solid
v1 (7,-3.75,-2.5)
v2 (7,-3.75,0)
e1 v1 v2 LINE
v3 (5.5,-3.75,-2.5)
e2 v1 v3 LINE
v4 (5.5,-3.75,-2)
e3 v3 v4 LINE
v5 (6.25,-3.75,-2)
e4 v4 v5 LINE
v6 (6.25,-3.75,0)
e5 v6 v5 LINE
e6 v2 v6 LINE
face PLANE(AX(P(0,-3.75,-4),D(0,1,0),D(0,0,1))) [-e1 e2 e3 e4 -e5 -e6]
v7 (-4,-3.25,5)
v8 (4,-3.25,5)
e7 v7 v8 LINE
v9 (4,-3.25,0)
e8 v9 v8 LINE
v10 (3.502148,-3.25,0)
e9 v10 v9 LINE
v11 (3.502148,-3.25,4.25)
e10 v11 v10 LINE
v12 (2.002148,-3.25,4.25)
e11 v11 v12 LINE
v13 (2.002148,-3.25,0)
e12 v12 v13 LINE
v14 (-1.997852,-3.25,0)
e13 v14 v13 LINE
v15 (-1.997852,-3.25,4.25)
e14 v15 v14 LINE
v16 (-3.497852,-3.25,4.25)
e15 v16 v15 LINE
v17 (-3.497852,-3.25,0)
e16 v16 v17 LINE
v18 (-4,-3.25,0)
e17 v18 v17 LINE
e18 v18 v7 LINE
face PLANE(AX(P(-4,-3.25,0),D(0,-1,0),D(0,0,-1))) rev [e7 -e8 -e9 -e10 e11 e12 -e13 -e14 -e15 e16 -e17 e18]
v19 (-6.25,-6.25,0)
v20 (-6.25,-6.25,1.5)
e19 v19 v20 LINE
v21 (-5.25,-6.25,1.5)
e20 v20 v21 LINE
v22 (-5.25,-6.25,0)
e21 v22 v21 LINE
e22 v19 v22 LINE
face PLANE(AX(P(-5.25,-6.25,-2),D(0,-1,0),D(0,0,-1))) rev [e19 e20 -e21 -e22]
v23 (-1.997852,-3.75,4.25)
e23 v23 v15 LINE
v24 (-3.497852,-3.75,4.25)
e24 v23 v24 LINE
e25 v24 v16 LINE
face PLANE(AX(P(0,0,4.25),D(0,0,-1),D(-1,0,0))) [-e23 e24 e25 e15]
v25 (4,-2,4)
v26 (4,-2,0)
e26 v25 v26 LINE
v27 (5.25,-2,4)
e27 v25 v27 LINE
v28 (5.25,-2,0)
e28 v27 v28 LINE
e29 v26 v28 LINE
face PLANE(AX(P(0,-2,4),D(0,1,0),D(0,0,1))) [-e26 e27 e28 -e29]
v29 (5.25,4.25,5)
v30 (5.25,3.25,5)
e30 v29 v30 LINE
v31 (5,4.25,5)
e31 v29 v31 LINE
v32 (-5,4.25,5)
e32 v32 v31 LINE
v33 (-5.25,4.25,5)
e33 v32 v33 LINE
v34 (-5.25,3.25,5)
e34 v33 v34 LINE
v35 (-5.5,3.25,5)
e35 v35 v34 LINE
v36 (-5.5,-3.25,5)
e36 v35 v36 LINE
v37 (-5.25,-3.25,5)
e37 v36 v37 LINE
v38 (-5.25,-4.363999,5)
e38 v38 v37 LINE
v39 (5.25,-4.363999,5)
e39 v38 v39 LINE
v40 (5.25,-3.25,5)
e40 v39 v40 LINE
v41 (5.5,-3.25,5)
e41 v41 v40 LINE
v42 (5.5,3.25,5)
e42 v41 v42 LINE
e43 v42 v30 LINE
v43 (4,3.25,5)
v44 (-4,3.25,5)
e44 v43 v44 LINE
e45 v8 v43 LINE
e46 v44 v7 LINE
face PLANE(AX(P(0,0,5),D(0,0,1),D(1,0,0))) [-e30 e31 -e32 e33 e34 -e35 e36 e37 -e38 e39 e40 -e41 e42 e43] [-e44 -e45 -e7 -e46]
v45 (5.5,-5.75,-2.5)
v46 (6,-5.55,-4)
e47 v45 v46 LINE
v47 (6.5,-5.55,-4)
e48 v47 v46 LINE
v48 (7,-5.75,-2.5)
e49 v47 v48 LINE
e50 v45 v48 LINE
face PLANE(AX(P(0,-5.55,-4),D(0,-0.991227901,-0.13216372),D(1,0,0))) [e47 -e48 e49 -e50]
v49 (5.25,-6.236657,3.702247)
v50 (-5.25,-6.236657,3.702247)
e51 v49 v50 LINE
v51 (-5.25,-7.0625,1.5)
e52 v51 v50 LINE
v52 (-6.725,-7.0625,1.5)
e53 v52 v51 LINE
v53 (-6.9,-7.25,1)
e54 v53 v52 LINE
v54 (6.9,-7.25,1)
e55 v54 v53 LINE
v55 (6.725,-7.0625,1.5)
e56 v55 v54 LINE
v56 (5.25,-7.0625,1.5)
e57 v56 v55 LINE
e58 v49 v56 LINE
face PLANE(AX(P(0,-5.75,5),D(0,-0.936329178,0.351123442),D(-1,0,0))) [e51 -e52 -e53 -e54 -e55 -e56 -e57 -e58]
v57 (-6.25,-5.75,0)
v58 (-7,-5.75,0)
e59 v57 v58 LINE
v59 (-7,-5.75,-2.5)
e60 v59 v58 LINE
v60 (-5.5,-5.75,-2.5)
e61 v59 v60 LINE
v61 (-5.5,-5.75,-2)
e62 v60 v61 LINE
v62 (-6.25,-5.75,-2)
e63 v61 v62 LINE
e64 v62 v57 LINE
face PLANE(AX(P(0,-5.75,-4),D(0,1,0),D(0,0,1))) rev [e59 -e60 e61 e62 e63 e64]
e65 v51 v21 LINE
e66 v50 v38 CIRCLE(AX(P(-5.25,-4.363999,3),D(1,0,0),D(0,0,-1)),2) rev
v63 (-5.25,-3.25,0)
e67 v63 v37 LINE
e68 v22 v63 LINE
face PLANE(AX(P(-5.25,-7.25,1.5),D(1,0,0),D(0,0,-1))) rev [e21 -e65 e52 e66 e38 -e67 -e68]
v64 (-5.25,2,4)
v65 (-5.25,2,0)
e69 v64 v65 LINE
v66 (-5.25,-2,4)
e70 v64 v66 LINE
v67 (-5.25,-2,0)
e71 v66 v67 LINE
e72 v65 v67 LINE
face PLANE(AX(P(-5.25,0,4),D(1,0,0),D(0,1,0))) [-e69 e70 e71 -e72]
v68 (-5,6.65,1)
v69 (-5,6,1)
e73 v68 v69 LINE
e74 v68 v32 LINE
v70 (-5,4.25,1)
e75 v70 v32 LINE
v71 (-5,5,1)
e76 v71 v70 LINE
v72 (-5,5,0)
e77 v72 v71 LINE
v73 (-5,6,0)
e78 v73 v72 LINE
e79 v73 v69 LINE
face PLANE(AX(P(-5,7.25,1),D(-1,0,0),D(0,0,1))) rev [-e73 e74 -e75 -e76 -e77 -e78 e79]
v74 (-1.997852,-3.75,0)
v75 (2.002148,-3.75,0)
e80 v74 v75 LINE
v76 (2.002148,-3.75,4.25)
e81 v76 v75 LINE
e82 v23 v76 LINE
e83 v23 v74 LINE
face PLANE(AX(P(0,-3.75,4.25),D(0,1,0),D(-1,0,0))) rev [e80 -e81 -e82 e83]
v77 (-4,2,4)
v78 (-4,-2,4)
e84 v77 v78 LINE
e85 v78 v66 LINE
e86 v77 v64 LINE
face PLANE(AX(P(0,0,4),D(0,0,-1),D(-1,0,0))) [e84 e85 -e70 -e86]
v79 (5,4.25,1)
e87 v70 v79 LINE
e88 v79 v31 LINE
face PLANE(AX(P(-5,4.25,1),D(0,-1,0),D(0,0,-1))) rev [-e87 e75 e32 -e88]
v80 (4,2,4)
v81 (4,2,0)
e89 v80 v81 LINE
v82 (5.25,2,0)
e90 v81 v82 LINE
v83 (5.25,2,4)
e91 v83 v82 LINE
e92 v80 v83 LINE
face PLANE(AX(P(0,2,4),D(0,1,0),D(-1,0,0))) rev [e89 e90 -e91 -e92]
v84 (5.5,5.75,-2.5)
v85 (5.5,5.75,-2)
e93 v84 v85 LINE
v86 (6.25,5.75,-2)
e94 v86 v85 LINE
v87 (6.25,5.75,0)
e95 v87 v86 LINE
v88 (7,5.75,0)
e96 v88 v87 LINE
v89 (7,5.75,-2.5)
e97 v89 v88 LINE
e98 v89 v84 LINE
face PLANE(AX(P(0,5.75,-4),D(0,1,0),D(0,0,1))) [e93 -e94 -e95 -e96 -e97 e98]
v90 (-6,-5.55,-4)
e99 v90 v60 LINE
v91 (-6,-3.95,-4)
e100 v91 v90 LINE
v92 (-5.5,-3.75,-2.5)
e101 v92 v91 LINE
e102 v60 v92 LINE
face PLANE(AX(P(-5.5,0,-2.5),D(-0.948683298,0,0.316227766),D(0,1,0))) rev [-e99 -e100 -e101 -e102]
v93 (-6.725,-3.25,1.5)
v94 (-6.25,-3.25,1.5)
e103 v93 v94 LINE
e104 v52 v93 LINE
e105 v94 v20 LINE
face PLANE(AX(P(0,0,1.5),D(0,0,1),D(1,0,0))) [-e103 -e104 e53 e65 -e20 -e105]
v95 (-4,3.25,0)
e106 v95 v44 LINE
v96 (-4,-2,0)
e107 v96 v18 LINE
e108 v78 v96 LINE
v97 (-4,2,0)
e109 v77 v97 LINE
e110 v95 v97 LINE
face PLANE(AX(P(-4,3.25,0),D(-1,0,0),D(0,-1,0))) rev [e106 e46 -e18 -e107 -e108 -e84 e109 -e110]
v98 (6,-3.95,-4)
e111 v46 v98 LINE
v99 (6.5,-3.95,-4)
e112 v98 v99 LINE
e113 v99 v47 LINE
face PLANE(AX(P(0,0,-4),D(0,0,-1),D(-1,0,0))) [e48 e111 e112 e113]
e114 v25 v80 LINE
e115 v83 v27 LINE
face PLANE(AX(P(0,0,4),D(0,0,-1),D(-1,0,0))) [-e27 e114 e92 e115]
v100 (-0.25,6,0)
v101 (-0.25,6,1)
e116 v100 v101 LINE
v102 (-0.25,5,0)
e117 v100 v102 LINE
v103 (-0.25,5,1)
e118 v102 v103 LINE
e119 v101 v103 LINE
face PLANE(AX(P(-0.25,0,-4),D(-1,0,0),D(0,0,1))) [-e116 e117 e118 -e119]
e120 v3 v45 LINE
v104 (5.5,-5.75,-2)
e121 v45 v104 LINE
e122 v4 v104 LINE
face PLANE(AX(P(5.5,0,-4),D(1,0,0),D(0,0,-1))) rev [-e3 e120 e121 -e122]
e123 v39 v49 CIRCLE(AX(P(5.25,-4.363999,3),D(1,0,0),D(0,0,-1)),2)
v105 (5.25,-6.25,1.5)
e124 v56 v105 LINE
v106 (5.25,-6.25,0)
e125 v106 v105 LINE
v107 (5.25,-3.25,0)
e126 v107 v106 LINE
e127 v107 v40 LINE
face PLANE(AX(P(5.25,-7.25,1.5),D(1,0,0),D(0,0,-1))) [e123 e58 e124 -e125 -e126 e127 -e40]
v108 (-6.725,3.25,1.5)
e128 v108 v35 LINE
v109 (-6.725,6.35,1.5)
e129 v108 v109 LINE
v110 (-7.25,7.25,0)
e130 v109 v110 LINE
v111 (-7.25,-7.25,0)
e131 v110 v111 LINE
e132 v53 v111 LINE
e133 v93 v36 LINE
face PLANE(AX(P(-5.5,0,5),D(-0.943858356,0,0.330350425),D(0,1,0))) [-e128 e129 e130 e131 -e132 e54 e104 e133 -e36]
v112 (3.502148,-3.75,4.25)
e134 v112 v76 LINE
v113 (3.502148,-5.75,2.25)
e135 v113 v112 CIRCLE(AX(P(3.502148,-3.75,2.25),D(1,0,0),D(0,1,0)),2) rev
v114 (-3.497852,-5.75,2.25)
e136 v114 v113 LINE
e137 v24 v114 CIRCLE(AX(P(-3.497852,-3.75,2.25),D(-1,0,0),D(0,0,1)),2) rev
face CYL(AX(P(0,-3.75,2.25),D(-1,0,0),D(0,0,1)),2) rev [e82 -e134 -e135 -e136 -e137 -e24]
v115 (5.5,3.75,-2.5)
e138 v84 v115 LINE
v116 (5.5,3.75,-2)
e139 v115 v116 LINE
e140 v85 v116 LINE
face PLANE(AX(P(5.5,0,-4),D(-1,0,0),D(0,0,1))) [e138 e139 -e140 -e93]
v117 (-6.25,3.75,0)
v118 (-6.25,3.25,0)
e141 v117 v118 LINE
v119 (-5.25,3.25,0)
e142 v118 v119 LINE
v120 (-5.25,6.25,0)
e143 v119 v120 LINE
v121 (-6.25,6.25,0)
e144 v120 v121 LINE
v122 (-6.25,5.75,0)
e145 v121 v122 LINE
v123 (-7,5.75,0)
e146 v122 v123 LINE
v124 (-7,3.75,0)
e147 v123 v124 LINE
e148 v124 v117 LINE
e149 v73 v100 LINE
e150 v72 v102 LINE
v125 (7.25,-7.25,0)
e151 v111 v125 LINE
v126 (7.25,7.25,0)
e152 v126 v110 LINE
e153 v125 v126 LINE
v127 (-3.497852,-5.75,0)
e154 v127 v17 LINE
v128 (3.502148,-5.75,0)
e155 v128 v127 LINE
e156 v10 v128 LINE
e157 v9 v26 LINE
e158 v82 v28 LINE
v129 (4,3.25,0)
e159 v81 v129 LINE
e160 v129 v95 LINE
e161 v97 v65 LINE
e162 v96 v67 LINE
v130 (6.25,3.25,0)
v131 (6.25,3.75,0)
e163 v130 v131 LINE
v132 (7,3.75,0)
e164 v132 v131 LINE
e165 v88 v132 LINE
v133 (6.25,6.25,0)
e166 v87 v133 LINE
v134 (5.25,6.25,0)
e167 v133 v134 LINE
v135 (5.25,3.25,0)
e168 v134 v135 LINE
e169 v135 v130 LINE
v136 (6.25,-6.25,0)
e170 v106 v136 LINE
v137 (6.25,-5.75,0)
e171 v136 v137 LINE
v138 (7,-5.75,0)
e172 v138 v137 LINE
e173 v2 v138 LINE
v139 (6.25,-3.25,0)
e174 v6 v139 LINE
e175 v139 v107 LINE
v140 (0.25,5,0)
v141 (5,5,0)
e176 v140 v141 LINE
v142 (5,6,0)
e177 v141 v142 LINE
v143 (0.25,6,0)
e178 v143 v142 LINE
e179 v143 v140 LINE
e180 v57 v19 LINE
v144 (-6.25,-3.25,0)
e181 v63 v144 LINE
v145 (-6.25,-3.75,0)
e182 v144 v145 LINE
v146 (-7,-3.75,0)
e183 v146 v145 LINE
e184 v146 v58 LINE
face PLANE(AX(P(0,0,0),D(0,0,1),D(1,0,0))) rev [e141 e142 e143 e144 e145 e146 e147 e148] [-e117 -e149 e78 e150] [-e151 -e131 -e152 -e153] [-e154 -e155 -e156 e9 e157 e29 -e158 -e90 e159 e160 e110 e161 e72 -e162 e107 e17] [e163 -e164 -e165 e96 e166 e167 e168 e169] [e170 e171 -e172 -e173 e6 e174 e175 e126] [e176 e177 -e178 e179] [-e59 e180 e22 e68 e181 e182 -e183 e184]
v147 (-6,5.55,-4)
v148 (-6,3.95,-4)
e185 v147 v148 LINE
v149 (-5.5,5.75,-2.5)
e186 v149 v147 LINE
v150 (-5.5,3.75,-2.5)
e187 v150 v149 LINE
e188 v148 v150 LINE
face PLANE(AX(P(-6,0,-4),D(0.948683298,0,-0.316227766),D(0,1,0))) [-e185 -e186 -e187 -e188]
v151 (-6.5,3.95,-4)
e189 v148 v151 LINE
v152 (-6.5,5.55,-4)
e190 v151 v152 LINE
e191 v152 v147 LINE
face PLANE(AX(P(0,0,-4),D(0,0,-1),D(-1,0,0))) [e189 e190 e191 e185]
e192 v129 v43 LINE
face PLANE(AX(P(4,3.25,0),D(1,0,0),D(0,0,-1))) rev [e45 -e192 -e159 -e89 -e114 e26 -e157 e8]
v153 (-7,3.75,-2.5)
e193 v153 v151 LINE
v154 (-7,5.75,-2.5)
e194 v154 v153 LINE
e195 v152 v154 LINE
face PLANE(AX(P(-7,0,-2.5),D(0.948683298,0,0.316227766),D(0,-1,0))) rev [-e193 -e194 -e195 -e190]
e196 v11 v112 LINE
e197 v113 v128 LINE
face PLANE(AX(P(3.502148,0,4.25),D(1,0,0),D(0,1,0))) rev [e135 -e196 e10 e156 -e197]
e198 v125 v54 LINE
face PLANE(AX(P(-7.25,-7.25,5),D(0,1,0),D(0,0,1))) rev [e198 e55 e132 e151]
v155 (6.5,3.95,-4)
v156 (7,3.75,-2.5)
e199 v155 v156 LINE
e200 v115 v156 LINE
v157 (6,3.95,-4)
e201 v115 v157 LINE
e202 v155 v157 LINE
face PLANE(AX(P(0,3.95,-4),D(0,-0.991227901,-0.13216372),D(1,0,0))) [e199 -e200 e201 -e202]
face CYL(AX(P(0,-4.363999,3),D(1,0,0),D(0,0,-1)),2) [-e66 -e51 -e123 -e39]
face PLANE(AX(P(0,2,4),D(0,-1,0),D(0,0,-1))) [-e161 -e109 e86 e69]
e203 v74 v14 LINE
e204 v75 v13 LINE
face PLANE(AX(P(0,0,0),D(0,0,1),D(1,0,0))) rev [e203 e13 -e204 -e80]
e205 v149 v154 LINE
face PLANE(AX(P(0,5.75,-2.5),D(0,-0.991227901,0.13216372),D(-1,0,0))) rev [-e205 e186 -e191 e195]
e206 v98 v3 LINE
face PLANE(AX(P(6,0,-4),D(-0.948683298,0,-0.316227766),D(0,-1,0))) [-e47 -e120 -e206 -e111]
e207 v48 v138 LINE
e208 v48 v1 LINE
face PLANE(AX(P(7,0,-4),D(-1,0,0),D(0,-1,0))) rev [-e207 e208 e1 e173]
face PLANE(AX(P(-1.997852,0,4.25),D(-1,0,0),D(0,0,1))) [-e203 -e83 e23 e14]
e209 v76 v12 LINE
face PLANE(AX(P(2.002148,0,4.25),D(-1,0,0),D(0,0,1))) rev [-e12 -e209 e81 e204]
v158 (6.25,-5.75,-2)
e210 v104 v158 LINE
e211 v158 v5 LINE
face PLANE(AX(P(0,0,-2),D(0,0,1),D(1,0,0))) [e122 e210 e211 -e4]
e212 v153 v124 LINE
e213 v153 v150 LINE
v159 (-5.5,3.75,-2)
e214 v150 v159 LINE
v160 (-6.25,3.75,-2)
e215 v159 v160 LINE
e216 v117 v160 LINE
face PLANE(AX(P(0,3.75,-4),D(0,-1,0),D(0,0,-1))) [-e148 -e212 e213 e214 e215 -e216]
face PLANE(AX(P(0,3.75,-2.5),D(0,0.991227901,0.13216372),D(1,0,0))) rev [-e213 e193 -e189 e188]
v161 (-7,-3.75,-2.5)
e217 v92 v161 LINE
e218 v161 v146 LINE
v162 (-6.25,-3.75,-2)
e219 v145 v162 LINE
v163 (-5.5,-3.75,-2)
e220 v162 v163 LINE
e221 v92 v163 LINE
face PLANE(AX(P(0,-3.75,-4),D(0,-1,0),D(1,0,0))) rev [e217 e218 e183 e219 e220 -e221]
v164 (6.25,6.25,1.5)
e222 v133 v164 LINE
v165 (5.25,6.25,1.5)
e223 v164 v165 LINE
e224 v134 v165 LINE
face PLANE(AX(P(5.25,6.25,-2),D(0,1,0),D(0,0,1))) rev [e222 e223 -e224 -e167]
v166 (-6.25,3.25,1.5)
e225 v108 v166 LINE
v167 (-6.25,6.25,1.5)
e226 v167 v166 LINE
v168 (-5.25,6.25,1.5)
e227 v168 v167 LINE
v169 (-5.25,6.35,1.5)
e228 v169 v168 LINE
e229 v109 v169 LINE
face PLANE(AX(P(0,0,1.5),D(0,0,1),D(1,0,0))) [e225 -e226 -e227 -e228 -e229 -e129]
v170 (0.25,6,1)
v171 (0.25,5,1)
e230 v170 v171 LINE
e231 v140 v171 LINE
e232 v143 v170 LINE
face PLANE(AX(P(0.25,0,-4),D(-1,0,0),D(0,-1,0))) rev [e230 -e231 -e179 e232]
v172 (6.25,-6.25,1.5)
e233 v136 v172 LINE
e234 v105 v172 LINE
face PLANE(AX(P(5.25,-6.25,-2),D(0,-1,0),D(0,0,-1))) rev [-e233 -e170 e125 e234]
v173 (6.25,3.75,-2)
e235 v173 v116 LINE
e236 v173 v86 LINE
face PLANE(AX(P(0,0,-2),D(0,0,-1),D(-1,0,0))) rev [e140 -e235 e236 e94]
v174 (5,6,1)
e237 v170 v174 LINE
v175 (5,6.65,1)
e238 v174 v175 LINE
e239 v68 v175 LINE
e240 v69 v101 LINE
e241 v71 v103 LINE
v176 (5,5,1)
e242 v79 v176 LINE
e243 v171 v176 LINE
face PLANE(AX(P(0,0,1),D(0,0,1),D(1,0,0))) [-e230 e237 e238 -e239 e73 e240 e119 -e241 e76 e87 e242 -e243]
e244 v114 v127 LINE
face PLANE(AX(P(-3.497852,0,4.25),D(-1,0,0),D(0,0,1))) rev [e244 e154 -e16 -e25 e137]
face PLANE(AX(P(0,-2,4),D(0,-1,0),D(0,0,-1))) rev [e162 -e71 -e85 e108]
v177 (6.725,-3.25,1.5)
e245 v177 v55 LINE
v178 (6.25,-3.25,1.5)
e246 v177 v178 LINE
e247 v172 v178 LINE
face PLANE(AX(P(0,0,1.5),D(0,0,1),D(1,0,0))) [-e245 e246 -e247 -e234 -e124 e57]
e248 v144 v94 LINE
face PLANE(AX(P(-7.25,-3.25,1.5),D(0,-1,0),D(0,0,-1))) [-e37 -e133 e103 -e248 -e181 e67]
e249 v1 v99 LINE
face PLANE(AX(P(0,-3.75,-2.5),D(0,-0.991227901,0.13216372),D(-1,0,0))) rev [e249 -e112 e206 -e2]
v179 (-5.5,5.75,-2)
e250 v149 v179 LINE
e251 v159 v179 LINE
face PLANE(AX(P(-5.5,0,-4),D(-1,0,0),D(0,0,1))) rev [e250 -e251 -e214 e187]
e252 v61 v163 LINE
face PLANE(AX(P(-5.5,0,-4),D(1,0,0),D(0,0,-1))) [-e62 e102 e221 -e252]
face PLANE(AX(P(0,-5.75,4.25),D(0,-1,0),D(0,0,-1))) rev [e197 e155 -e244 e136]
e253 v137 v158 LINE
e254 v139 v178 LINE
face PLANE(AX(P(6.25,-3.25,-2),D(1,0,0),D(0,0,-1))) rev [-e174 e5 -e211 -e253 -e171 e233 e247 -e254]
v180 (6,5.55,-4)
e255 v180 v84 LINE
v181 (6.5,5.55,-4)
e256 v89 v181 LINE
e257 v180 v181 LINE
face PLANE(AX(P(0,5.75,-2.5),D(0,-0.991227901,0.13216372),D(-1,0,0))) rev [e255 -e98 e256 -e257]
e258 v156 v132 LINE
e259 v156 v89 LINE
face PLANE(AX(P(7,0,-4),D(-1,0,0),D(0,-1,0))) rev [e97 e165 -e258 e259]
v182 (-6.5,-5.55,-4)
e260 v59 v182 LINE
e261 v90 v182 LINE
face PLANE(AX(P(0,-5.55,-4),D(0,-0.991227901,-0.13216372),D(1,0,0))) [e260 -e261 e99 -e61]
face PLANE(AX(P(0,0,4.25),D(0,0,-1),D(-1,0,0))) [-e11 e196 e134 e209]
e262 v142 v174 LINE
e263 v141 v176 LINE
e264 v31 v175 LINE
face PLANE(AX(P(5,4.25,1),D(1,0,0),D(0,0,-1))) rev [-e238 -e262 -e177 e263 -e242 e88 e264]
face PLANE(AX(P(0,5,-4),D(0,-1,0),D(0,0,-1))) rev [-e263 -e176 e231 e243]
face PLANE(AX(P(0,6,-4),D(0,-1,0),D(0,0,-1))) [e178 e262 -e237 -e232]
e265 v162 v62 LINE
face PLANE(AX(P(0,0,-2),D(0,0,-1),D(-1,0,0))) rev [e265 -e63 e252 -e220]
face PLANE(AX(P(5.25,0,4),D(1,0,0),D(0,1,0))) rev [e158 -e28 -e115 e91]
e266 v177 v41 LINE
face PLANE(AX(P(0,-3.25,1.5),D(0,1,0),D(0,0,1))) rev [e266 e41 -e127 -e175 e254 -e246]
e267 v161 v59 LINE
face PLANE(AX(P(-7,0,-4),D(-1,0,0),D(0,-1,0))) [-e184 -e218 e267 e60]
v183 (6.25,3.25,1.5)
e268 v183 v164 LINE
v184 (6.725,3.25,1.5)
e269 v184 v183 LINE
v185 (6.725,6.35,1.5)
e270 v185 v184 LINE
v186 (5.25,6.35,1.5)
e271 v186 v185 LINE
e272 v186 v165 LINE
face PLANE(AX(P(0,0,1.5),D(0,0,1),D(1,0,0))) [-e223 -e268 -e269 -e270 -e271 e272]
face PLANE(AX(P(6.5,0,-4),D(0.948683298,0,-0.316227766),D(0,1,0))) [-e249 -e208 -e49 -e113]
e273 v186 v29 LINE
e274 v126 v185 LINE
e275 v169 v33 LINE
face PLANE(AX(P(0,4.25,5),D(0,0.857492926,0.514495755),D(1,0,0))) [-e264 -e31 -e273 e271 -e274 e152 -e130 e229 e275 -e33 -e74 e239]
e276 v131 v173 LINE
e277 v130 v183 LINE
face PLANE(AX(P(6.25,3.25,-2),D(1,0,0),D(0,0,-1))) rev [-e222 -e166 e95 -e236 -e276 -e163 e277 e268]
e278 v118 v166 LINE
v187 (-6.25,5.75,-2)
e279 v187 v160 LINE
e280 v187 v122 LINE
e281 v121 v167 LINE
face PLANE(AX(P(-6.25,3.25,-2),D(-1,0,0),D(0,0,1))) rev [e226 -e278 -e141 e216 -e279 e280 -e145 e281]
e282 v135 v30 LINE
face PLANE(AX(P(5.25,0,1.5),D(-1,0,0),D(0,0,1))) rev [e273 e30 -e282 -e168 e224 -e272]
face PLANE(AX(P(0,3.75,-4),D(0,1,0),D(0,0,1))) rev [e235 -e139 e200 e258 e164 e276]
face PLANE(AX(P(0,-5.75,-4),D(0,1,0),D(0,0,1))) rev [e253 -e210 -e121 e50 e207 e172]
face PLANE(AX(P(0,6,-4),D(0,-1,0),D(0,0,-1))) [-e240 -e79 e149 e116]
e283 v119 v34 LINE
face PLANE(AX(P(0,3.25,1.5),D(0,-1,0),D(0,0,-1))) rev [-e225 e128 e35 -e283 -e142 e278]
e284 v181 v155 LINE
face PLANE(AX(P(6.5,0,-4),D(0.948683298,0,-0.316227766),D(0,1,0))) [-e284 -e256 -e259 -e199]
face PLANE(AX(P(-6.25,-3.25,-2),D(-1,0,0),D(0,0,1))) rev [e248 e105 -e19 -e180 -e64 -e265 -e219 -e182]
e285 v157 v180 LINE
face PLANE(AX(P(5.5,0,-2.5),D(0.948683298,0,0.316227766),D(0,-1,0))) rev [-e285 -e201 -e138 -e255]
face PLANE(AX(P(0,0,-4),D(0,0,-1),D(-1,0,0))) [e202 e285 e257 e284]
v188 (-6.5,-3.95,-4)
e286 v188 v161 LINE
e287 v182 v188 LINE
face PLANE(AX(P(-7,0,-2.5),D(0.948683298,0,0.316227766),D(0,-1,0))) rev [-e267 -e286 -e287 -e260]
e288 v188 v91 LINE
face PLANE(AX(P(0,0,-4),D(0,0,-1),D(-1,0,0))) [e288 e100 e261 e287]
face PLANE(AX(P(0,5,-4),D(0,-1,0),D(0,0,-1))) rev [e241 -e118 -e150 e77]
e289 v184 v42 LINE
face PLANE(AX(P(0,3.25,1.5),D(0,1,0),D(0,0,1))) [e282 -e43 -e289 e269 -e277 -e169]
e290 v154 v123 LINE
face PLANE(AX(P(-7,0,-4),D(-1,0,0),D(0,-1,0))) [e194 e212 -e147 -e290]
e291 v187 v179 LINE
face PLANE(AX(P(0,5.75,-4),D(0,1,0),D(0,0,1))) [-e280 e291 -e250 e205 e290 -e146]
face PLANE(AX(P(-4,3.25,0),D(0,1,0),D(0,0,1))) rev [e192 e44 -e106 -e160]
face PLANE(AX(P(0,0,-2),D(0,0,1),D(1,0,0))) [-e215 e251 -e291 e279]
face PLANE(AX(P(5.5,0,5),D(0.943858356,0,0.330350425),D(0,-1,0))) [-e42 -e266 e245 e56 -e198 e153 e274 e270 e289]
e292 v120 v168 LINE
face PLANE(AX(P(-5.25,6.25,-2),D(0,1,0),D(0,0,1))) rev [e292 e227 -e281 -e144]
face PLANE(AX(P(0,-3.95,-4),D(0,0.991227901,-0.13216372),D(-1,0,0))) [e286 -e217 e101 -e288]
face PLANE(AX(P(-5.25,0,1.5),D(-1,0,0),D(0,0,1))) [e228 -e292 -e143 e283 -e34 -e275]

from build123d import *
from OCP.BRepFilletAPI import BRepFilletAPI_MakeChamfer

# Parameters (mm, degrees)
ESQUISSE1_W             = 14.5
ESQUISSE1_H             = 14.5
BOSS_EXTRU_1_DEPTH      = 5
ESQUISSE2_W             = 8
ESQUISSE2_H             = 6.5
ENL_V_MAT_EXTRU_1_DEPTH = 12.407234547
CHANFREIN1_SIZE         = 5
CHANFREIN1_SIZE_2       = 1.75
CHANFREIN2_SIZE         = 5
CHANFREIN2_SIZE_2       = 3
ESQUISSE3_W             = 2
ESQUISSE3_H             = 4
ENL_V_MAT_EXTRU_2_DEPTH = 3.5
ESQUISSE6_W             = 10
ESQUISSE6_H             = 3
ENL_V_MAT_EXTRU_3_DEPTH = 4
CHANFREIN3_SIZE         = 4
CHANFREIN3_SIZE2        = 1.5
CONG_1_R                = 2
ESQUISSE7_W             = 1.25
ESQUISSE7_H             = 4
ENL_V_MAT_EXTRU_4_DEPTH = 4
ESQUISSE8_W             = 1.5
ESQUISSE8_H             = 2
BOSS_EXTRU_2_DEPTH      = 4
CHANFREIN4_SIZE         = 0.2
CHANFREIN4_SIZE2        = 1.5
CHANFREIN5_SIZE         = 1.5
CHANFREIN5_SIZE2        = 0.2
CHANFREIN6_SIZE         = 0.5
CHANFREIN6_SIZE2        = 1.5
CHANFREIN7_SIZE         = 1.5
CHANFREIN7_SIZE2        = 0.5
ESQUISSE9_W             = 1
ESQUISSE9_H             = 3
ENL_V_MAT_EXTRU_5_DEPTH = 3.5
ESQUISSE10_W            = 4.75
ESQUISSE10_H            = 1
ENL_V_MAT_EXTRU_6_DEPTH = 12.407234547
ESQUISSE11_W            = 1.5
ESQUISSE11_H            = 0.5
ENL_V_MAT_EXTRU_7_DEPTH = 4.25
CONG_2_START            = -3.497851783
CONG_2_DEPTH            = 7


with BuildPart() as part:
    # Esquisse1 → Boss.-Extru.1 (new body)
    with BuildSketch(Plane.XY):
        Rectangle(ESQUISSE1_W, ESQUISSE1_H)
    extrude(amount=BOSS_EXTRU_1_DEPTH)

    # Esquisse2 → Enlèv. mat.-Extru.1 (cut, through all)
    with BuildSketch(Plane.XY.offset(5)):
        Rectangle(ESQUISSE2_W, ESQUISSE2_H)
    extrude(amount=-ENL_V_MAT_EXTRU_1_DEPTH, mode=Mode.SUBTRACT)

    # Chanfrein1
    # the kernel refuses this chamfer: 5, 1.75 mm, written as the material it takes off along each edge
    with BuildSketch(Plane(origin=(7.25, 20.222980747, 5), x_dir=(0, 0, -1), z_dir=(0, -1, 0)), Plane(origin=(-7.25, -20.222980747, 5), x_dir=(0, 0, -1), z_dir=(0, 1, 0))) as chanfrein1_piece_1:
        Polygon((CHANFREIN1_SIZE, 0), (0, -CHANFREIN1_SIZE_2), (0, 0), align=None)
    extrude(amount=40.445961493, mode=Mode.SUBTRACT)

    # Chanfrein2
    # the kernel refuses this chamfer: 5, 3 mm, written as the material it takes off along each edge
    with BuildSketch(Plane(origin=(-18.431305486, 7.25, 5), x_dir=(0, 0, -1), z_dir=(1, 0, 0))) as chanfrein2_piece_1:
        Polygon((CHANFREIN2_SIZE, 0), (0, -CHANFREIN2_SIZE_2), (0, 0), align=None)
    extrude(amount=36.862610972, mode=Mode.SUBTRACT)

    # Esquisse3 → Enlèv. mat.-Extru.2 (cut)
    with BuildSketch(Plane.XY.offset(5)):
        with Locations((-6.25, 5.25)):
            Rectangle(ESQUISSE3_W, ESQUISSE3_H)
        with Locations((6.25, 5.25)):
            Rectangle(ESQUISSE3_W, ESQUISSE3_H)
        with Locations((6.25, -5.25)):
            Rectangle(ESQUISSE3_W, ESQUISSE3_H)
        with Locations((-6.25, -5.25)):
            Rectangle(ESQUISSE3_W, ESQUISSE3_H)
    extrude(amount=-ENL_V_MAT_EXTRU_2_DEPTH, mode=Mode.SUBTRACT)

    # Esquisse6 → Enlèv. mat.-Extru.3 (cut)
    with BuildSketch(Plane.XY.offset(5)):
        with Locations((0, 5.75)):
            Rectangle(ESQUISSE6_W, ESQUISSE6_H)
    extrude(amount=-ENL_V_MAT_EXTRU_3_DEPTH, mode=Mode.SUBTRACT)

    # Chanfrein3
    chanfrein3_edges = [part.edges().sort_by_distance(p)[0] for p in [
        (0, -7.25, 5),
    ]]
    chanfrein3_side = [part.faces().sort_by_distance(p)[0] for p in [
        (0, -7.25, 2.338531514),
    ]]
    chamfer(chanfrein3_edges, length=CHANFREIN3_SIZE, length2=CHANFREIN3_SIZE2, reference=chanfrein3_side[0])

    # Congé1
    cong_1_edges = [part.edges().sort_by_distance(p)[0] for p in [
        (0, -5.75, 5),
    ]]
    fillet(cong_1_edges, radius=CONG_1_R)

    # Esquisse7 → Enlèv. mat.-Extru.4 (cut)
    with BuildSketch(Plane(origin=(0, 0, 0), x_dir=(-1, 0, 0), z_dir=(0, 0, -1))):
        with Locations((-4.625, 0)):
            Rectangle(ESQUISSE7_W, ESQUISSE7_H)
        with Locations((4.625, 0)):
            Rectangle(ESQUISSE7_W, ESQUISSE7_H)
    extrude(amount=-ENL_V_MAT_EXTRU_4_DEPTH, mode=Mode.SUBTRACT)

    # Esquisse8 → Boss.-Extru.2 (add)
    with BuildSketch(Plane(origin=(0, 0, 0), x_dir=(-1, 0, 0), z_dir=(0, 0, -1))):
        with Locations((-6.25, 4.75)):
            Rectangle(ESQUISSE8_W, ESQUISSE8_H)
        with Locations((6.25, 4.75)):
            Rectangle(ESQUISSE8_W, ESQUISSE8_H)
        with Locations((6.25, -4.75)):
            Rectangle(ESQUISSE8_W, ESQUISSE8_H)
        with Locations((-6.25, -4.75)):
            Rectangle(ESQUISSE8_W, ESQUISSE8_H)
    extrude(amount=BOSS_EXTRU_2_DEPTH)

    # Chanfrein4: one chamfer whose edges measure the first distance from different faces: ONE call of the kernel's chamfer builder (chamfer() names one face for all edges)
    chanfrein4_edges_1 = [part.edges().sort_by_distance(p)[0] for p in [
        (6.25, 5.75, -4),
    ]]
    chanfrein4_side_1 = [part.faces().sort_by_distance(p)[0] for p in [
        (6.25, 4.75, -4),
    ]]
    chanfrein4_edges_2 = [part.edges().sort_by_distance(p)[0] for p in [
        (-6.25, 3.75, -4),
        (-6.25, 5.75, -4),
    ]]
    chanfrein4_side_2 = [part.faces().sort_by_distance(p)[0] for p in [
        (-6.25, 4.75, -4),
    ]]
    chanfrein4_edges_3 = [part.edges().sort_by_distance(p)[0] for p in [
        (6.25, -3.75, -4),
    ]]
    chanfrein4_side_3 = [part.faces().sort_by_distance(p)[0] for p in [
        (6.25, -4.75, -4),
    ]]
    chanfrein4 = BRepFilletAPI_MakeChamfer(part.part.solid().wrapped)
    for e in chanfrein4_edges_1:
        chanfrein4.Add(CHANFREIN4_SIZE, CHANFREIN4_SIZE2, e.wrapped, chanfrein4_side_1[0].wrapped)  # the first distance lies on this face
    for e in chanfrein4_edges_2:
        chanfrein4.Add(CHANFREIN4_SIZE, CHANFREIN4_SIZE2, e.wrapped, chanfrein4_side_2[0].wrapped)  # the first distance lies on this face
    for e in chanfrein4_edges_3:
        chanfrein4.Add(CHANFREIN4_SIZE, CHANFREIN4_SIZE2, e.wrapped, chanfrein4_side_3[0].wrapped)  # the first distance lies on this face
    add(Compound.cast(chanfrein4.Shape()), mode=Mode.REPLACE)

    # Chanfrein5: one chamfer whose edges measure the first distance from different faces: ONE call of the kernel's chamfer builder (chamfer() names one face for all edges)
    chanfrein5_edges_1 = [part.edges().sort_by_distance(p)[0] for p in [
        (6.25, 3.75, -4),
    ]]
    chanfrein5_side_1 = [part.faces().sort_by_distance(p)[0] for p in [
        (6.25, 3.75, -2),
    ]]
    chanfrein5_edges_2 = [part.edges().sort_by_distance(p)[0] for p in [
        (-6.25, -5.75, -4),
    ]]
    chanfrein5_side_2 = [part.faces().sort_by_distance(p)[0] for p in [
        (-6.25, -5.75, -2),
    ]]
    chanfrein5_edges_3 = [part.edges().sort_by_distance(p)[0] for p in [
        (-6.25, -3.75, -4),
    ]]
    chanfrein5_side_3 = [part.faces().sort_by_distance(p)[0] for p in [
        (-6.25, -3.75, -2),
    ]]
    chanfrein5_edges_4 = [part.edges().sort_by_distance(p)[0] for p in [
        (6.25, -5.75, -4),
    ]]
    chanfrein5_side_4 = [part.faces().sort_by_distance(p)[0] for p in [
        (6.25, -5.75, -2),
    ]]
    chanfrein5 = BRepFilletAPI_MakeChamfer(part.part.solid().wrapped)
    for e in chanfrein5_edges_1:
        chanfrein5.Add(CHANFREIN5_SIZE, CHANFREIN5_SIZE2, e.wrapped, chanfrein5_side_1[0].wrapped)  # the first distance lies on this face
    for e in chanfrein5_edges_2:
        chanfrein5.Add(CHANFREIN5_SIZE, CHANFREIN5_SIZE2, e.wrapped, chanfrein5_side_2[0].wrapped)  # the first distance lies on this face
    for e in chanfrein5_edges_3:
        chanfrein5.Add(CHANFREIN5_SIZE, CHANFREIN5_SIZE2, e.wrapped, chanfrein5_side_3[0].wrapped)  # the first distance lies on this face
    for e in chanfrein5_edges_4:
        chanfrein5.Add(CHANFREIN5_SIZE, CHANFREIN5_SIZE2, e.wrapped, chanfrein5_side_4[0].wrapped)  # the first distance lies on this face
    add(Compound.cast(chanfrein5.Shape()), mode=Mode.REPLACE)

    # Chanfrein6: one chamfer whose edges measure the first distance from different faces: ONE call of the kernel's chamfer builder (chamfer() names one face for all edges)
    chanfrein6_edges_1 = [part.edges().sort_by_distance(p)[0] for p in [
        (5.5, 4.75, -4),
    ]]
    chanfrein6_side_1 = [part.faces().sort_by_distance(p)[0] for p in [
        (6.25, 4.75, -4),
    ]]
    chanfrein6_edges_2 = [part.edges().sort_by_distance(p)[0] for p in [
        (-7, 4.75, -4),
    ]]
    chanfrein6_side_2 = [part.faces().sort_by_distance(p)[0] for p in [
        (-6.25, 4.75, -4),
    ]]
    chanfrein6_edges_3 = [part.edges().sort_by_distance(p)[0] for p in [
        (-5.5, -4.75, -4),
        (-7, -4.75, -4),
    ]]
    chanfrein6_side_3 = [part.faces().sort_by_distance(p)[0] for p in [
        (-6.25, -4.75, -4),
    ]]
    chanfrein6 = BRepFilletAPI_MakeChamfer(part.part.solid().wrapped)
    for e in chanfrein6_edges_1:
        chanfrein6.Add(CHANFREIN6_SIZE, CHANFREIN6_SIZE2, e.wrapped, chanfrein6_side_1[0].wrapped)  # the first distance lies on this face
    for e in chanfrein6_edges_2:
        chanfrein6.Add(CHANFREIN6_SIZE, CHANFREIN6_SIZE2, e.wrapped, chanfrein6_side_2[0].wrapped)  # the first distance lies on this face
    for e in chanfrein6_edges_3:
        chanfrein6.Add(CHANFREIN6_SIZE, CHANFREIN6_SIZE2, e.wrapped, chanfrein6_side_3[0].wrapped)  # the first distance lies on this face
    add(Compound.cast(chanfrein6.Shape()), mode=Mode.REPLACE)

    # Chanfrein7: one chamfer whose edges measure the first distance from different faces: ONE call of the kernel's chamfer builder (chamfer() names one face for all edges)
    chanfrein7_edges_1 = [part.edges().sort_by_distance(p)[0] for p in [
        (5.5, -4.75, -4),
    ]]
    chanfrein7_side_1 = [part.faces().sort_by_distance(p)[0] for p in [
        (5.5, -4.75, -1.941558442),
    ]]
    chanfrein7_edges_2 = [part.edges().sort_by_distance(p)[0] for p in [
        (-5.5, 4.75, -4),
    ]]
    chanfrein7_side_2 = [part.faces().sort_by_distance(p)[0] for p in [
        (-5.5, 4.75, -1.941558442),
    ]]
    chanfrein7_edges_3 = [part.edges().sort_by_distance(p)[0] for p in [
        (7, 4.75, -4),
    ]]
    chanfrein7_side_3 = [part.faces().sort_by_distance(p)[0] for p in [
        (7, 4.75, -1.941558442),
    ]]
    chanfrein7_edges_4 = [part.edges().sort_by_distance(p)[0] for p in [
        (7, -4.75, -4),
    ]]
    chanfrein7_side_4 = [part.faces().sort_by_distance(p)[0] for p in [
        (7, -4.75, -1.941558442),
    ]]
    chanfrein7 = BRepFilletAPI_MakeChamfer(part.part.solid().wrapped)
    for e in chanfrein7_edges_1:
        chanfrein7.Add(CHANFREIN7_SIZE, CHANFREIN7_SIZE2, e.wrapped, chanfrein7_side_1[0].wrapped)  # the first distance lies on this face
    for e in chanfrein7_edges_2:
        chanfrein7.Add(CHANFREIN7_SIZE, CHANFREIN7_SIZE2, e.wrapped, chanfrein7_side_2[0].wrapped)  # the first distance lies on this face
    for e in chanfrein7_edges_3:
        chanfrein7.Add(CHANFREIN7_SIZE, CHANFREIN7_SIZE2, e.wrapped, chanfrein7_side_3[0].wrapped)  # the first distance lies on this face
    for e in chanfrein7_edges_4:
        chanfrein7.Add(CHANFREIN7_SIZE, CHANFREIN7_SIZE2, e.wrapped, chanfrein7_side_4[0].wrapped)  # the first distance lies on this face
    add(Compound.cast(chanfrein7.Shape()), mode=Mode.REPLACE)

    # Esquisse9 → Enlèv. mat.-Extru.5 (cut)
    with BuildSketch(Plane.XY.offset(1.5)):
        with Locations((-5.75, 4.75)):
            Rectangle(ESQUISSE9_W, ESQUISSE9_H)
        with Locations((-5.75, -4.75)):
            Rectangle(ESQUISSE9_W, ESQUISSE9_H)
        with Locations((5.75, -4.75)):
            Rectangle(ESQUISSE9_W, ESQUISSE9_H)
        with Locations((5.75, 4.75)):
            Rectangle(ESQUISSE9_W, ESQUISSE9_H)
    extrude(amount=-ENL_V_MAT_EXTRU_5_DEPTH, mode=Mode.SUBTRACT)

    # Esquisse10 → Enlèv. mat.-Extru.6 (cut, through all)
    with BuildSketch(Plane.XY.offset(1)):
        with Locations((-2.625, 5.5)):
            Rectangle(ESQUISSE10_W, ESQUISSE10_H)
        with Locations((2.625, 5.5)):
            Rectangle(ESQUISSE10_W, ESQUISSE10_H)
    extrude(amount=-ENL_V_MAT_EXTRU_6_DEPTH, mode=Mode.SUBTRACT)

    # Esquisse11 → Enlèv. mat.-Extru.7 (cut)
    with BuildSketch(Plane(origin=(0, 0, 0), x_dir=(-1, 0, 0), z_dir=(0, 0, -1))):
        Polygon((-3.502148217, -3.75), (-3.502148217, -5.75), (0, -5.75), (3.497851783, -5.75), (3.497851783, -3.75), align=None)
        with Locations((2.747851783, -3.5)):
            Rectangle(ESQUISSE11_W, ESQUISSE11_H)
        with Locations((-2.752148217, -3.5)):
            Rectangle(ESQUISSE11_W, ESQUISSE11_H)
    extrude(amount=-ENL_V_MAT_EXTRU_7_DEPTH, mode=Mode.SUBTRACT)

    # Congé2: read off the stored shape, not the designer's step
    # Congé2 outline → Congé2 (add)
    with BuildSketch(Plane.YZ.offset(CONG_2_START)):
        with BuildLine():
            Line((-5.75, 4.25), (-5.75, 2.25))
            ThreePointArc((-5.75, 2.25), (-5.164213562, 3.664213562), (-3.75, 4.25))
            Line((-3.75, 4.25), (-5.75, 4.25))
        make_face()
    extrude(amount=CONG_2_DEPTH)


solid = part.part
